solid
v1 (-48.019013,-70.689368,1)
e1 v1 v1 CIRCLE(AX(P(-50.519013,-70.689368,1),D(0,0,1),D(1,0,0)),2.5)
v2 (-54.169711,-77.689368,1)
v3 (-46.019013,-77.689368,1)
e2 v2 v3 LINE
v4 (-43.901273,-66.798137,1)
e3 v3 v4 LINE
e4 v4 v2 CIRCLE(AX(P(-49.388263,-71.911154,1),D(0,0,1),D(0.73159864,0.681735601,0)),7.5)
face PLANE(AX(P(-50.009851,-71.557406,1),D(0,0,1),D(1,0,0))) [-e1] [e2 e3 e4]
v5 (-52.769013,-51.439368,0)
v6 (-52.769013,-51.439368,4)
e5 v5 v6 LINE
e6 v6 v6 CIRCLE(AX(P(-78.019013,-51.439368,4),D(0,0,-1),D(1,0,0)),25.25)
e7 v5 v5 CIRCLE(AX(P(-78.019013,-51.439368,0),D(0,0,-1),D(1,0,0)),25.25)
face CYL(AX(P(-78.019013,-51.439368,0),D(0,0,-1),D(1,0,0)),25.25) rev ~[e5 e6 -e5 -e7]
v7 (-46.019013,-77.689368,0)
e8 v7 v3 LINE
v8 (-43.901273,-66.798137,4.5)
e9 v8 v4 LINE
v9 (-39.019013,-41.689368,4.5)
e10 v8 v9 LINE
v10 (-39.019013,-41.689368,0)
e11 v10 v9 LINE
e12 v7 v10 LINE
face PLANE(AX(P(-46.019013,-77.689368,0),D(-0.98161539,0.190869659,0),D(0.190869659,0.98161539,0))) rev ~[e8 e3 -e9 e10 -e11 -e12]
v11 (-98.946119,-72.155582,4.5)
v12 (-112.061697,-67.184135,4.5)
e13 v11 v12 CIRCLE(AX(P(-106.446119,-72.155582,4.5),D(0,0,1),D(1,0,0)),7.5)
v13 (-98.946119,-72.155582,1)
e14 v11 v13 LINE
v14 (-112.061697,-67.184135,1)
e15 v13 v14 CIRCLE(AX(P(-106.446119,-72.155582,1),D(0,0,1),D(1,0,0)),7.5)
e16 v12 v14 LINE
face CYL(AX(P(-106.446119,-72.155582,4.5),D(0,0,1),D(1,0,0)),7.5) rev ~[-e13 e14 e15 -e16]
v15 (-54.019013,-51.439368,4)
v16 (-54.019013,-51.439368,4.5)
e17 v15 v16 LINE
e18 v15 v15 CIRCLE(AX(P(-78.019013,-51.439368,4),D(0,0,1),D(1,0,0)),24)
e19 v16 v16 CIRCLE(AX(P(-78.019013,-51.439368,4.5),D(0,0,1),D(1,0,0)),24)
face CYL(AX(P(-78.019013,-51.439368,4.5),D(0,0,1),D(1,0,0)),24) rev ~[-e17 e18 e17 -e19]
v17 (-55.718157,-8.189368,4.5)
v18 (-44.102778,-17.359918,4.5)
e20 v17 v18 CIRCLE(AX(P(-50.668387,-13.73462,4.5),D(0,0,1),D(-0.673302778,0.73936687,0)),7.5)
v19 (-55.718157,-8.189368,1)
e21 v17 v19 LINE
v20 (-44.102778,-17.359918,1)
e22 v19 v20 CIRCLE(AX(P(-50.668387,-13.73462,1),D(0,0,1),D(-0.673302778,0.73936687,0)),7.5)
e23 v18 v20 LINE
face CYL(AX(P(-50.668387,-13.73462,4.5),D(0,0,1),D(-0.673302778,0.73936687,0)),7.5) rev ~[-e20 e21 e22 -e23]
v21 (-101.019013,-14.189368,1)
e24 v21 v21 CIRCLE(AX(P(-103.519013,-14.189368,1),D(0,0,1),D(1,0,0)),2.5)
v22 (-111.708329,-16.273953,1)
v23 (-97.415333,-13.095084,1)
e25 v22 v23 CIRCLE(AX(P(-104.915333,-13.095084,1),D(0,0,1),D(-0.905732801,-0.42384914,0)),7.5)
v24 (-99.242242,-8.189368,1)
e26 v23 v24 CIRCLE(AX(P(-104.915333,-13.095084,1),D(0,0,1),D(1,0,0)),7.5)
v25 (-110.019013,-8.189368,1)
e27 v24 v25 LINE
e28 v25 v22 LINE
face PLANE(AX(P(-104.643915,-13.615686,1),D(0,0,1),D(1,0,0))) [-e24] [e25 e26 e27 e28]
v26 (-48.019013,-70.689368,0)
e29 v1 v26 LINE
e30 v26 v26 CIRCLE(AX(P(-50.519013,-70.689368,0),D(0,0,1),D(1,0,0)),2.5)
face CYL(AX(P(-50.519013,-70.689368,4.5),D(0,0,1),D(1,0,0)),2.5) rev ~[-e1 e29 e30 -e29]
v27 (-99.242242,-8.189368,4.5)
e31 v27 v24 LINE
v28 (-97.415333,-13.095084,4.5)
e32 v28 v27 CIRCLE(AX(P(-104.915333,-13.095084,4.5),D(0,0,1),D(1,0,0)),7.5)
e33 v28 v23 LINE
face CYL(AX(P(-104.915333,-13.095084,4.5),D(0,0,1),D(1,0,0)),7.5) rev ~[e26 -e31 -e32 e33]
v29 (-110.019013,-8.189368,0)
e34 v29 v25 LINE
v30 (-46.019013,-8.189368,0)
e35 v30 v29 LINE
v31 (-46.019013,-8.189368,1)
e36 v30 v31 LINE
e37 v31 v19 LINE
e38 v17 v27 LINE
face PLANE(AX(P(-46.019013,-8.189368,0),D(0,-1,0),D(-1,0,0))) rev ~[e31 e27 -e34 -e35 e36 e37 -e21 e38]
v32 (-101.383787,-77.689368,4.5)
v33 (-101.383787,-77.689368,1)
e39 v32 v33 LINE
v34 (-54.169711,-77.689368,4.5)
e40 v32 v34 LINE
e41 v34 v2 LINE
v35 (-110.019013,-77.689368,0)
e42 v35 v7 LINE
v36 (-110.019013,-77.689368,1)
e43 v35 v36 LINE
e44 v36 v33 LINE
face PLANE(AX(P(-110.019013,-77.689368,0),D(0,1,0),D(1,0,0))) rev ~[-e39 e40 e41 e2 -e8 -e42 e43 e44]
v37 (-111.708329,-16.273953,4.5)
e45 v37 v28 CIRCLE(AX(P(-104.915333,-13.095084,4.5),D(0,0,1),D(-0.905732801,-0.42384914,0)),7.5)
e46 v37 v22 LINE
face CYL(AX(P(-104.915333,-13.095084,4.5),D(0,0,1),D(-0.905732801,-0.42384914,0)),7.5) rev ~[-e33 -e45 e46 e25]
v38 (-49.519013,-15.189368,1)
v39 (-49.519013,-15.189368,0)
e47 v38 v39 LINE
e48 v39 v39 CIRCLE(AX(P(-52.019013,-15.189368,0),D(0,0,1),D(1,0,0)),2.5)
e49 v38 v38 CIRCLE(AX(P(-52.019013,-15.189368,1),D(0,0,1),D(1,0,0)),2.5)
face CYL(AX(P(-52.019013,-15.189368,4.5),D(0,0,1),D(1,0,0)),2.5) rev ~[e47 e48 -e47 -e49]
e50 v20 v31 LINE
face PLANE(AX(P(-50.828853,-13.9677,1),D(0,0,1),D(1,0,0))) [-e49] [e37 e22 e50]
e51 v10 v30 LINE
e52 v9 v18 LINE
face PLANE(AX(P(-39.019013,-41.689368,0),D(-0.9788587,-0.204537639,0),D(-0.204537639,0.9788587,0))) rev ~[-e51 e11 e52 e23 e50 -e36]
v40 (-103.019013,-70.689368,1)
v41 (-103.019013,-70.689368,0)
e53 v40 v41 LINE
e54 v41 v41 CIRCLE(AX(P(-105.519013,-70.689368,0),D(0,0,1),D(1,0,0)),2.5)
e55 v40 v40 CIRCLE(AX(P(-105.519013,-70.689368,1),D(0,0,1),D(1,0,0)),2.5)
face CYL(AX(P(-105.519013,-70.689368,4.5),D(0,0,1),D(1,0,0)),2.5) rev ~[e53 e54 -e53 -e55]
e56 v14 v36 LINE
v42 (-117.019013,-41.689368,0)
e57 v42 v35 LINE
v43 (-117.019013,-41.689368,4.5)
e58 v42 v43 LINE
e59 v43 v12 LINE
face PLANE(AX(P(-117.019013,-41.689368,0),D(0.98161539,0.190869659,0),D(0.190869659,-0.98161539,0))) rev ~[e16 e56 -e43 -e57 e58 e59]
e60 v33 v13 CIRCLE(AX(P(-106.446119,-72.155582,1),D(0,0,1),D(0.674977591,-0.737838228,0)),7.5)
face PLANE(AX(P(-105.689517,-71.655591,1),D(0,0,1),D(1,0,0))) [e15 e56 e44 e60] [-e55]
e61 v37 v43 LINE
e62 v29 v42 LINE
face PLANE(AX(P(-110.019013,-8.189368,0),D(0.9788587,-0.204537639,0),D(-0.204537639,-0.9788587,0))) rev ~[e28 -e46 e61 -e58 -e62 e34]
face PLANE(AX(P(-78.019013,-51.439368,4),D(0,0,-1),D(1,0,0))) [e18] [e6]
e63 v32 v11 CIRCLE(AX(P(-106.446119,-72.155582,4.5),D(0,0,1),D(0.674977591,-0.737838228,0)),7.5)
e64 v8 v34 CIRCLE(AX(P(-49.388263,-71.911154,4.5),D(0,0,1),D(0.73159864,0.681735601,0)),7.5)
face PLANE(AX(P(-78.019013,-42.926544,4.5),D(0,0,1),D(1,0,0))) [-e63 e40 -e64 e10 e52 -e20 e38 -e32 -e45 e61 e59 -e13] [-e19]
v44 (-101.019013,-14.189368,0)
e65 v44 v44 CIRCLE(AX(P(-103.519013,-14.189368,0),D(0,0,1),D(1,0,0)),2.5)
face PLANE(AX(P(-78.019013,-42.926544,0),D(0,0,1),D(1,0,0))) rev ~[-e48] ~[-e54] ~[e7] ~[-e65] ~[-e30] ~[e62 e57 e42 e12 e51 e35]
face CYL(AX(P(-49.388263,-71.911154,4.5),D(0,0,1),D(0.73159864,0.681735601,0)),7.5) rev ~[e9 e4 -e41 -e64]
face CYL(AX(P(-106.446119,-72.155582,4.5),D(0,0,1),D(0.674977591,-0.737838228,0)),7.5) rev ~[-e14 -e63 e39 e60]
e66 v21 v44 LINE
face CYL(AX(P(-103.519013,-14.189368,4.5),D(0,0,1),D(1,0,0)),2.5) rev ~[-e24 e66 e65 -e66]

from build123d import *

# Parameters (mm, degrees)
F1_DEPTH = 4.5
F2_R     = 11
F2_R_2   = 24
F3_DEPTH = 50
F2_R_3   = 2.5
F4_DEPTH = 25
F5_DEPTH = 3.5
F6_DEPTH = 2
F7_R     = 25.25
F8_DEPTH = 4


# Not quite as in the source:
# - a feature names something its author has since deleted; it is built from what else it names


with BuildPart() as f1:
    # F0 (on Top) → F1 (new body)
    with BuildSketch(Plane.XY):
        Polygon((-46.0190125704, -8.1893682778), (-110.0190125704, -8.1893682778), (-117.0190125704, -41.6893682778), (-110.0190125704, -77.6893682778), (-46.0190125704, -77.6893682778), (-39.0190125704, -41.6893682778), align=None)
    extrude(amount=F1_DEPTH)

    # F2 (on face) → F3 (cut)
    with BuildSketch(Plane.XY.offset(4.5)):
        with Locations((36.7125935962, -5.1025906342)):
            Circle(F2_R)
        with Locations((63.6127434798, -2.782690585)):
            Circle(F2_R)
        with Locations((-78.0190125704, -51.4393682778)):
            Circle(F2_R_2)
    extrude(amount=-F3_DEPTH, mode=Mode.SUBTRACT)

    # F2 (on face) → F4 (cut)
    with BuildSketch(Plane.XY.offset(4.5)):
        with Locations((-103.5190125704, -14.1893682778)):
            Circle(F2_R_3)
        with Locations((-52.0190125704, -15.1893682778)):
            Circle(F2_R_3)
        with Locations((-105.5190125704, -70.6893682778)):
            Circle(F2_R_3)
        with Locations((-50.5190125704, -70.6893682778)):
            Circle(F2_R_3)
    extrude(amount=-F4_DEPTH, mode=Mode.SUBTRACT)

    # F2 (on face) → F5 (cut)
    with BuildSketch(Plane.XY.offset(4.5)):
        with BuildLine():
            Line((-110.0190125704, -8.1893682778), (-111.7083286904, -16.2739525667))
            ThreePointArc((-111.7083286904, -16.2739525667), (-103.2870621366, -20.4161997132), (-97.4153326836, -13.0950840178))
            ThreePointArc((-97.4153326836, -13.0950840178), (-97.8868841728, -10.4776594188), (-99.2422424253, -8.1893682778))
            Line((-99.2422424253, -8.1893682778), (-110.0190125704, -8.1893682778))
        make_face()
        with Locations((-103.5190125704, -14.1893682778)):
            Circle(F2_R_3, mode=Mode.SUBTRACT)
        with BuildLine():
            Line((-46.0190125704, -8.1893682778), (-55.7181574473, -8.1893682778))
            ThreePointArc((-55.7181574473, -8.1893682778), (-55.3158791173, -19.6211139555), (-44.1027782894, -17.3599180513))
            Line((-44.1027782894, -17.3599180513), (-46.0190125704, -8.1893682778))
        make_face()
        with Locations((-52.0190125704, -15.1893682778)):
            Circle(F2_R_3, mode=Mode.SUBTRACT)
        with BuildLine():
            ThreePointArc((-101.3837870838, -77.6893682778), (-99.5825379735, -75.1790324483), (-98.9461190179, -72.1555815644))
            ThreePointArc((-98.9461190179, -72.1555815644), (-103.7878144934, -65.1424925834), (-112.0616968993, -67.1841345861))
            Line((-112.0616968993, -67.1841345861), (-110.0190125704, -77.6893682778))
            Line((-110.0190125704, -77.6893682778), (-101.3837870838, -77.6893682778))
        make_face()
        with Locations((-105.5190125704, -70.6893682778)):
            Circle(F2_R_3, mode=Mode.SUBTRACT)
        with BuildLine():
            ThreePointArc((-43.9012732129, -66.7981372962), (-54.8452929266, -66.7661737817), (-54.1697108353, -77.6893682778))
            Line((-54.1697108353, -77.6893682778), (-46.0190125704, -77.6893682778))
            Line((-46.0190125704, -77.6893682778), (-43.9012732129, -66.7981372962))
        make_face()
        with Locations((-50.5190125704, -70.6893682778)):
            Circle(F2_R_3, mode=Mode.SUBTRACT)
    extrude(amount=-F5_DEPTH, mode=Mode.SUBTRACT)

    # F2 (on face) → F6 (cut)
    with BuildSketch(Plane.XY.offset(4.5)):
        with Locations((-78.0190125704, -51.4393682778)):
            Circle(F2_R_2)
    extrude(amount=-F6_DEPTH, mode=Mode.SUBTRACT)

    # F7 (on face) → F8 (cut)
    with BuildSketch(Plane(origin=(0, 0, 0), x_dir=(1, 0, 0), z_dir=(0, 0, -1))):
        with Locations((-78.0190125704, 51.4393682778)):
            Circle(F7_R)
    extrude(amount=-F8_DEPTH, mode=Mode.SUBTRACT)


solid = f1.part
